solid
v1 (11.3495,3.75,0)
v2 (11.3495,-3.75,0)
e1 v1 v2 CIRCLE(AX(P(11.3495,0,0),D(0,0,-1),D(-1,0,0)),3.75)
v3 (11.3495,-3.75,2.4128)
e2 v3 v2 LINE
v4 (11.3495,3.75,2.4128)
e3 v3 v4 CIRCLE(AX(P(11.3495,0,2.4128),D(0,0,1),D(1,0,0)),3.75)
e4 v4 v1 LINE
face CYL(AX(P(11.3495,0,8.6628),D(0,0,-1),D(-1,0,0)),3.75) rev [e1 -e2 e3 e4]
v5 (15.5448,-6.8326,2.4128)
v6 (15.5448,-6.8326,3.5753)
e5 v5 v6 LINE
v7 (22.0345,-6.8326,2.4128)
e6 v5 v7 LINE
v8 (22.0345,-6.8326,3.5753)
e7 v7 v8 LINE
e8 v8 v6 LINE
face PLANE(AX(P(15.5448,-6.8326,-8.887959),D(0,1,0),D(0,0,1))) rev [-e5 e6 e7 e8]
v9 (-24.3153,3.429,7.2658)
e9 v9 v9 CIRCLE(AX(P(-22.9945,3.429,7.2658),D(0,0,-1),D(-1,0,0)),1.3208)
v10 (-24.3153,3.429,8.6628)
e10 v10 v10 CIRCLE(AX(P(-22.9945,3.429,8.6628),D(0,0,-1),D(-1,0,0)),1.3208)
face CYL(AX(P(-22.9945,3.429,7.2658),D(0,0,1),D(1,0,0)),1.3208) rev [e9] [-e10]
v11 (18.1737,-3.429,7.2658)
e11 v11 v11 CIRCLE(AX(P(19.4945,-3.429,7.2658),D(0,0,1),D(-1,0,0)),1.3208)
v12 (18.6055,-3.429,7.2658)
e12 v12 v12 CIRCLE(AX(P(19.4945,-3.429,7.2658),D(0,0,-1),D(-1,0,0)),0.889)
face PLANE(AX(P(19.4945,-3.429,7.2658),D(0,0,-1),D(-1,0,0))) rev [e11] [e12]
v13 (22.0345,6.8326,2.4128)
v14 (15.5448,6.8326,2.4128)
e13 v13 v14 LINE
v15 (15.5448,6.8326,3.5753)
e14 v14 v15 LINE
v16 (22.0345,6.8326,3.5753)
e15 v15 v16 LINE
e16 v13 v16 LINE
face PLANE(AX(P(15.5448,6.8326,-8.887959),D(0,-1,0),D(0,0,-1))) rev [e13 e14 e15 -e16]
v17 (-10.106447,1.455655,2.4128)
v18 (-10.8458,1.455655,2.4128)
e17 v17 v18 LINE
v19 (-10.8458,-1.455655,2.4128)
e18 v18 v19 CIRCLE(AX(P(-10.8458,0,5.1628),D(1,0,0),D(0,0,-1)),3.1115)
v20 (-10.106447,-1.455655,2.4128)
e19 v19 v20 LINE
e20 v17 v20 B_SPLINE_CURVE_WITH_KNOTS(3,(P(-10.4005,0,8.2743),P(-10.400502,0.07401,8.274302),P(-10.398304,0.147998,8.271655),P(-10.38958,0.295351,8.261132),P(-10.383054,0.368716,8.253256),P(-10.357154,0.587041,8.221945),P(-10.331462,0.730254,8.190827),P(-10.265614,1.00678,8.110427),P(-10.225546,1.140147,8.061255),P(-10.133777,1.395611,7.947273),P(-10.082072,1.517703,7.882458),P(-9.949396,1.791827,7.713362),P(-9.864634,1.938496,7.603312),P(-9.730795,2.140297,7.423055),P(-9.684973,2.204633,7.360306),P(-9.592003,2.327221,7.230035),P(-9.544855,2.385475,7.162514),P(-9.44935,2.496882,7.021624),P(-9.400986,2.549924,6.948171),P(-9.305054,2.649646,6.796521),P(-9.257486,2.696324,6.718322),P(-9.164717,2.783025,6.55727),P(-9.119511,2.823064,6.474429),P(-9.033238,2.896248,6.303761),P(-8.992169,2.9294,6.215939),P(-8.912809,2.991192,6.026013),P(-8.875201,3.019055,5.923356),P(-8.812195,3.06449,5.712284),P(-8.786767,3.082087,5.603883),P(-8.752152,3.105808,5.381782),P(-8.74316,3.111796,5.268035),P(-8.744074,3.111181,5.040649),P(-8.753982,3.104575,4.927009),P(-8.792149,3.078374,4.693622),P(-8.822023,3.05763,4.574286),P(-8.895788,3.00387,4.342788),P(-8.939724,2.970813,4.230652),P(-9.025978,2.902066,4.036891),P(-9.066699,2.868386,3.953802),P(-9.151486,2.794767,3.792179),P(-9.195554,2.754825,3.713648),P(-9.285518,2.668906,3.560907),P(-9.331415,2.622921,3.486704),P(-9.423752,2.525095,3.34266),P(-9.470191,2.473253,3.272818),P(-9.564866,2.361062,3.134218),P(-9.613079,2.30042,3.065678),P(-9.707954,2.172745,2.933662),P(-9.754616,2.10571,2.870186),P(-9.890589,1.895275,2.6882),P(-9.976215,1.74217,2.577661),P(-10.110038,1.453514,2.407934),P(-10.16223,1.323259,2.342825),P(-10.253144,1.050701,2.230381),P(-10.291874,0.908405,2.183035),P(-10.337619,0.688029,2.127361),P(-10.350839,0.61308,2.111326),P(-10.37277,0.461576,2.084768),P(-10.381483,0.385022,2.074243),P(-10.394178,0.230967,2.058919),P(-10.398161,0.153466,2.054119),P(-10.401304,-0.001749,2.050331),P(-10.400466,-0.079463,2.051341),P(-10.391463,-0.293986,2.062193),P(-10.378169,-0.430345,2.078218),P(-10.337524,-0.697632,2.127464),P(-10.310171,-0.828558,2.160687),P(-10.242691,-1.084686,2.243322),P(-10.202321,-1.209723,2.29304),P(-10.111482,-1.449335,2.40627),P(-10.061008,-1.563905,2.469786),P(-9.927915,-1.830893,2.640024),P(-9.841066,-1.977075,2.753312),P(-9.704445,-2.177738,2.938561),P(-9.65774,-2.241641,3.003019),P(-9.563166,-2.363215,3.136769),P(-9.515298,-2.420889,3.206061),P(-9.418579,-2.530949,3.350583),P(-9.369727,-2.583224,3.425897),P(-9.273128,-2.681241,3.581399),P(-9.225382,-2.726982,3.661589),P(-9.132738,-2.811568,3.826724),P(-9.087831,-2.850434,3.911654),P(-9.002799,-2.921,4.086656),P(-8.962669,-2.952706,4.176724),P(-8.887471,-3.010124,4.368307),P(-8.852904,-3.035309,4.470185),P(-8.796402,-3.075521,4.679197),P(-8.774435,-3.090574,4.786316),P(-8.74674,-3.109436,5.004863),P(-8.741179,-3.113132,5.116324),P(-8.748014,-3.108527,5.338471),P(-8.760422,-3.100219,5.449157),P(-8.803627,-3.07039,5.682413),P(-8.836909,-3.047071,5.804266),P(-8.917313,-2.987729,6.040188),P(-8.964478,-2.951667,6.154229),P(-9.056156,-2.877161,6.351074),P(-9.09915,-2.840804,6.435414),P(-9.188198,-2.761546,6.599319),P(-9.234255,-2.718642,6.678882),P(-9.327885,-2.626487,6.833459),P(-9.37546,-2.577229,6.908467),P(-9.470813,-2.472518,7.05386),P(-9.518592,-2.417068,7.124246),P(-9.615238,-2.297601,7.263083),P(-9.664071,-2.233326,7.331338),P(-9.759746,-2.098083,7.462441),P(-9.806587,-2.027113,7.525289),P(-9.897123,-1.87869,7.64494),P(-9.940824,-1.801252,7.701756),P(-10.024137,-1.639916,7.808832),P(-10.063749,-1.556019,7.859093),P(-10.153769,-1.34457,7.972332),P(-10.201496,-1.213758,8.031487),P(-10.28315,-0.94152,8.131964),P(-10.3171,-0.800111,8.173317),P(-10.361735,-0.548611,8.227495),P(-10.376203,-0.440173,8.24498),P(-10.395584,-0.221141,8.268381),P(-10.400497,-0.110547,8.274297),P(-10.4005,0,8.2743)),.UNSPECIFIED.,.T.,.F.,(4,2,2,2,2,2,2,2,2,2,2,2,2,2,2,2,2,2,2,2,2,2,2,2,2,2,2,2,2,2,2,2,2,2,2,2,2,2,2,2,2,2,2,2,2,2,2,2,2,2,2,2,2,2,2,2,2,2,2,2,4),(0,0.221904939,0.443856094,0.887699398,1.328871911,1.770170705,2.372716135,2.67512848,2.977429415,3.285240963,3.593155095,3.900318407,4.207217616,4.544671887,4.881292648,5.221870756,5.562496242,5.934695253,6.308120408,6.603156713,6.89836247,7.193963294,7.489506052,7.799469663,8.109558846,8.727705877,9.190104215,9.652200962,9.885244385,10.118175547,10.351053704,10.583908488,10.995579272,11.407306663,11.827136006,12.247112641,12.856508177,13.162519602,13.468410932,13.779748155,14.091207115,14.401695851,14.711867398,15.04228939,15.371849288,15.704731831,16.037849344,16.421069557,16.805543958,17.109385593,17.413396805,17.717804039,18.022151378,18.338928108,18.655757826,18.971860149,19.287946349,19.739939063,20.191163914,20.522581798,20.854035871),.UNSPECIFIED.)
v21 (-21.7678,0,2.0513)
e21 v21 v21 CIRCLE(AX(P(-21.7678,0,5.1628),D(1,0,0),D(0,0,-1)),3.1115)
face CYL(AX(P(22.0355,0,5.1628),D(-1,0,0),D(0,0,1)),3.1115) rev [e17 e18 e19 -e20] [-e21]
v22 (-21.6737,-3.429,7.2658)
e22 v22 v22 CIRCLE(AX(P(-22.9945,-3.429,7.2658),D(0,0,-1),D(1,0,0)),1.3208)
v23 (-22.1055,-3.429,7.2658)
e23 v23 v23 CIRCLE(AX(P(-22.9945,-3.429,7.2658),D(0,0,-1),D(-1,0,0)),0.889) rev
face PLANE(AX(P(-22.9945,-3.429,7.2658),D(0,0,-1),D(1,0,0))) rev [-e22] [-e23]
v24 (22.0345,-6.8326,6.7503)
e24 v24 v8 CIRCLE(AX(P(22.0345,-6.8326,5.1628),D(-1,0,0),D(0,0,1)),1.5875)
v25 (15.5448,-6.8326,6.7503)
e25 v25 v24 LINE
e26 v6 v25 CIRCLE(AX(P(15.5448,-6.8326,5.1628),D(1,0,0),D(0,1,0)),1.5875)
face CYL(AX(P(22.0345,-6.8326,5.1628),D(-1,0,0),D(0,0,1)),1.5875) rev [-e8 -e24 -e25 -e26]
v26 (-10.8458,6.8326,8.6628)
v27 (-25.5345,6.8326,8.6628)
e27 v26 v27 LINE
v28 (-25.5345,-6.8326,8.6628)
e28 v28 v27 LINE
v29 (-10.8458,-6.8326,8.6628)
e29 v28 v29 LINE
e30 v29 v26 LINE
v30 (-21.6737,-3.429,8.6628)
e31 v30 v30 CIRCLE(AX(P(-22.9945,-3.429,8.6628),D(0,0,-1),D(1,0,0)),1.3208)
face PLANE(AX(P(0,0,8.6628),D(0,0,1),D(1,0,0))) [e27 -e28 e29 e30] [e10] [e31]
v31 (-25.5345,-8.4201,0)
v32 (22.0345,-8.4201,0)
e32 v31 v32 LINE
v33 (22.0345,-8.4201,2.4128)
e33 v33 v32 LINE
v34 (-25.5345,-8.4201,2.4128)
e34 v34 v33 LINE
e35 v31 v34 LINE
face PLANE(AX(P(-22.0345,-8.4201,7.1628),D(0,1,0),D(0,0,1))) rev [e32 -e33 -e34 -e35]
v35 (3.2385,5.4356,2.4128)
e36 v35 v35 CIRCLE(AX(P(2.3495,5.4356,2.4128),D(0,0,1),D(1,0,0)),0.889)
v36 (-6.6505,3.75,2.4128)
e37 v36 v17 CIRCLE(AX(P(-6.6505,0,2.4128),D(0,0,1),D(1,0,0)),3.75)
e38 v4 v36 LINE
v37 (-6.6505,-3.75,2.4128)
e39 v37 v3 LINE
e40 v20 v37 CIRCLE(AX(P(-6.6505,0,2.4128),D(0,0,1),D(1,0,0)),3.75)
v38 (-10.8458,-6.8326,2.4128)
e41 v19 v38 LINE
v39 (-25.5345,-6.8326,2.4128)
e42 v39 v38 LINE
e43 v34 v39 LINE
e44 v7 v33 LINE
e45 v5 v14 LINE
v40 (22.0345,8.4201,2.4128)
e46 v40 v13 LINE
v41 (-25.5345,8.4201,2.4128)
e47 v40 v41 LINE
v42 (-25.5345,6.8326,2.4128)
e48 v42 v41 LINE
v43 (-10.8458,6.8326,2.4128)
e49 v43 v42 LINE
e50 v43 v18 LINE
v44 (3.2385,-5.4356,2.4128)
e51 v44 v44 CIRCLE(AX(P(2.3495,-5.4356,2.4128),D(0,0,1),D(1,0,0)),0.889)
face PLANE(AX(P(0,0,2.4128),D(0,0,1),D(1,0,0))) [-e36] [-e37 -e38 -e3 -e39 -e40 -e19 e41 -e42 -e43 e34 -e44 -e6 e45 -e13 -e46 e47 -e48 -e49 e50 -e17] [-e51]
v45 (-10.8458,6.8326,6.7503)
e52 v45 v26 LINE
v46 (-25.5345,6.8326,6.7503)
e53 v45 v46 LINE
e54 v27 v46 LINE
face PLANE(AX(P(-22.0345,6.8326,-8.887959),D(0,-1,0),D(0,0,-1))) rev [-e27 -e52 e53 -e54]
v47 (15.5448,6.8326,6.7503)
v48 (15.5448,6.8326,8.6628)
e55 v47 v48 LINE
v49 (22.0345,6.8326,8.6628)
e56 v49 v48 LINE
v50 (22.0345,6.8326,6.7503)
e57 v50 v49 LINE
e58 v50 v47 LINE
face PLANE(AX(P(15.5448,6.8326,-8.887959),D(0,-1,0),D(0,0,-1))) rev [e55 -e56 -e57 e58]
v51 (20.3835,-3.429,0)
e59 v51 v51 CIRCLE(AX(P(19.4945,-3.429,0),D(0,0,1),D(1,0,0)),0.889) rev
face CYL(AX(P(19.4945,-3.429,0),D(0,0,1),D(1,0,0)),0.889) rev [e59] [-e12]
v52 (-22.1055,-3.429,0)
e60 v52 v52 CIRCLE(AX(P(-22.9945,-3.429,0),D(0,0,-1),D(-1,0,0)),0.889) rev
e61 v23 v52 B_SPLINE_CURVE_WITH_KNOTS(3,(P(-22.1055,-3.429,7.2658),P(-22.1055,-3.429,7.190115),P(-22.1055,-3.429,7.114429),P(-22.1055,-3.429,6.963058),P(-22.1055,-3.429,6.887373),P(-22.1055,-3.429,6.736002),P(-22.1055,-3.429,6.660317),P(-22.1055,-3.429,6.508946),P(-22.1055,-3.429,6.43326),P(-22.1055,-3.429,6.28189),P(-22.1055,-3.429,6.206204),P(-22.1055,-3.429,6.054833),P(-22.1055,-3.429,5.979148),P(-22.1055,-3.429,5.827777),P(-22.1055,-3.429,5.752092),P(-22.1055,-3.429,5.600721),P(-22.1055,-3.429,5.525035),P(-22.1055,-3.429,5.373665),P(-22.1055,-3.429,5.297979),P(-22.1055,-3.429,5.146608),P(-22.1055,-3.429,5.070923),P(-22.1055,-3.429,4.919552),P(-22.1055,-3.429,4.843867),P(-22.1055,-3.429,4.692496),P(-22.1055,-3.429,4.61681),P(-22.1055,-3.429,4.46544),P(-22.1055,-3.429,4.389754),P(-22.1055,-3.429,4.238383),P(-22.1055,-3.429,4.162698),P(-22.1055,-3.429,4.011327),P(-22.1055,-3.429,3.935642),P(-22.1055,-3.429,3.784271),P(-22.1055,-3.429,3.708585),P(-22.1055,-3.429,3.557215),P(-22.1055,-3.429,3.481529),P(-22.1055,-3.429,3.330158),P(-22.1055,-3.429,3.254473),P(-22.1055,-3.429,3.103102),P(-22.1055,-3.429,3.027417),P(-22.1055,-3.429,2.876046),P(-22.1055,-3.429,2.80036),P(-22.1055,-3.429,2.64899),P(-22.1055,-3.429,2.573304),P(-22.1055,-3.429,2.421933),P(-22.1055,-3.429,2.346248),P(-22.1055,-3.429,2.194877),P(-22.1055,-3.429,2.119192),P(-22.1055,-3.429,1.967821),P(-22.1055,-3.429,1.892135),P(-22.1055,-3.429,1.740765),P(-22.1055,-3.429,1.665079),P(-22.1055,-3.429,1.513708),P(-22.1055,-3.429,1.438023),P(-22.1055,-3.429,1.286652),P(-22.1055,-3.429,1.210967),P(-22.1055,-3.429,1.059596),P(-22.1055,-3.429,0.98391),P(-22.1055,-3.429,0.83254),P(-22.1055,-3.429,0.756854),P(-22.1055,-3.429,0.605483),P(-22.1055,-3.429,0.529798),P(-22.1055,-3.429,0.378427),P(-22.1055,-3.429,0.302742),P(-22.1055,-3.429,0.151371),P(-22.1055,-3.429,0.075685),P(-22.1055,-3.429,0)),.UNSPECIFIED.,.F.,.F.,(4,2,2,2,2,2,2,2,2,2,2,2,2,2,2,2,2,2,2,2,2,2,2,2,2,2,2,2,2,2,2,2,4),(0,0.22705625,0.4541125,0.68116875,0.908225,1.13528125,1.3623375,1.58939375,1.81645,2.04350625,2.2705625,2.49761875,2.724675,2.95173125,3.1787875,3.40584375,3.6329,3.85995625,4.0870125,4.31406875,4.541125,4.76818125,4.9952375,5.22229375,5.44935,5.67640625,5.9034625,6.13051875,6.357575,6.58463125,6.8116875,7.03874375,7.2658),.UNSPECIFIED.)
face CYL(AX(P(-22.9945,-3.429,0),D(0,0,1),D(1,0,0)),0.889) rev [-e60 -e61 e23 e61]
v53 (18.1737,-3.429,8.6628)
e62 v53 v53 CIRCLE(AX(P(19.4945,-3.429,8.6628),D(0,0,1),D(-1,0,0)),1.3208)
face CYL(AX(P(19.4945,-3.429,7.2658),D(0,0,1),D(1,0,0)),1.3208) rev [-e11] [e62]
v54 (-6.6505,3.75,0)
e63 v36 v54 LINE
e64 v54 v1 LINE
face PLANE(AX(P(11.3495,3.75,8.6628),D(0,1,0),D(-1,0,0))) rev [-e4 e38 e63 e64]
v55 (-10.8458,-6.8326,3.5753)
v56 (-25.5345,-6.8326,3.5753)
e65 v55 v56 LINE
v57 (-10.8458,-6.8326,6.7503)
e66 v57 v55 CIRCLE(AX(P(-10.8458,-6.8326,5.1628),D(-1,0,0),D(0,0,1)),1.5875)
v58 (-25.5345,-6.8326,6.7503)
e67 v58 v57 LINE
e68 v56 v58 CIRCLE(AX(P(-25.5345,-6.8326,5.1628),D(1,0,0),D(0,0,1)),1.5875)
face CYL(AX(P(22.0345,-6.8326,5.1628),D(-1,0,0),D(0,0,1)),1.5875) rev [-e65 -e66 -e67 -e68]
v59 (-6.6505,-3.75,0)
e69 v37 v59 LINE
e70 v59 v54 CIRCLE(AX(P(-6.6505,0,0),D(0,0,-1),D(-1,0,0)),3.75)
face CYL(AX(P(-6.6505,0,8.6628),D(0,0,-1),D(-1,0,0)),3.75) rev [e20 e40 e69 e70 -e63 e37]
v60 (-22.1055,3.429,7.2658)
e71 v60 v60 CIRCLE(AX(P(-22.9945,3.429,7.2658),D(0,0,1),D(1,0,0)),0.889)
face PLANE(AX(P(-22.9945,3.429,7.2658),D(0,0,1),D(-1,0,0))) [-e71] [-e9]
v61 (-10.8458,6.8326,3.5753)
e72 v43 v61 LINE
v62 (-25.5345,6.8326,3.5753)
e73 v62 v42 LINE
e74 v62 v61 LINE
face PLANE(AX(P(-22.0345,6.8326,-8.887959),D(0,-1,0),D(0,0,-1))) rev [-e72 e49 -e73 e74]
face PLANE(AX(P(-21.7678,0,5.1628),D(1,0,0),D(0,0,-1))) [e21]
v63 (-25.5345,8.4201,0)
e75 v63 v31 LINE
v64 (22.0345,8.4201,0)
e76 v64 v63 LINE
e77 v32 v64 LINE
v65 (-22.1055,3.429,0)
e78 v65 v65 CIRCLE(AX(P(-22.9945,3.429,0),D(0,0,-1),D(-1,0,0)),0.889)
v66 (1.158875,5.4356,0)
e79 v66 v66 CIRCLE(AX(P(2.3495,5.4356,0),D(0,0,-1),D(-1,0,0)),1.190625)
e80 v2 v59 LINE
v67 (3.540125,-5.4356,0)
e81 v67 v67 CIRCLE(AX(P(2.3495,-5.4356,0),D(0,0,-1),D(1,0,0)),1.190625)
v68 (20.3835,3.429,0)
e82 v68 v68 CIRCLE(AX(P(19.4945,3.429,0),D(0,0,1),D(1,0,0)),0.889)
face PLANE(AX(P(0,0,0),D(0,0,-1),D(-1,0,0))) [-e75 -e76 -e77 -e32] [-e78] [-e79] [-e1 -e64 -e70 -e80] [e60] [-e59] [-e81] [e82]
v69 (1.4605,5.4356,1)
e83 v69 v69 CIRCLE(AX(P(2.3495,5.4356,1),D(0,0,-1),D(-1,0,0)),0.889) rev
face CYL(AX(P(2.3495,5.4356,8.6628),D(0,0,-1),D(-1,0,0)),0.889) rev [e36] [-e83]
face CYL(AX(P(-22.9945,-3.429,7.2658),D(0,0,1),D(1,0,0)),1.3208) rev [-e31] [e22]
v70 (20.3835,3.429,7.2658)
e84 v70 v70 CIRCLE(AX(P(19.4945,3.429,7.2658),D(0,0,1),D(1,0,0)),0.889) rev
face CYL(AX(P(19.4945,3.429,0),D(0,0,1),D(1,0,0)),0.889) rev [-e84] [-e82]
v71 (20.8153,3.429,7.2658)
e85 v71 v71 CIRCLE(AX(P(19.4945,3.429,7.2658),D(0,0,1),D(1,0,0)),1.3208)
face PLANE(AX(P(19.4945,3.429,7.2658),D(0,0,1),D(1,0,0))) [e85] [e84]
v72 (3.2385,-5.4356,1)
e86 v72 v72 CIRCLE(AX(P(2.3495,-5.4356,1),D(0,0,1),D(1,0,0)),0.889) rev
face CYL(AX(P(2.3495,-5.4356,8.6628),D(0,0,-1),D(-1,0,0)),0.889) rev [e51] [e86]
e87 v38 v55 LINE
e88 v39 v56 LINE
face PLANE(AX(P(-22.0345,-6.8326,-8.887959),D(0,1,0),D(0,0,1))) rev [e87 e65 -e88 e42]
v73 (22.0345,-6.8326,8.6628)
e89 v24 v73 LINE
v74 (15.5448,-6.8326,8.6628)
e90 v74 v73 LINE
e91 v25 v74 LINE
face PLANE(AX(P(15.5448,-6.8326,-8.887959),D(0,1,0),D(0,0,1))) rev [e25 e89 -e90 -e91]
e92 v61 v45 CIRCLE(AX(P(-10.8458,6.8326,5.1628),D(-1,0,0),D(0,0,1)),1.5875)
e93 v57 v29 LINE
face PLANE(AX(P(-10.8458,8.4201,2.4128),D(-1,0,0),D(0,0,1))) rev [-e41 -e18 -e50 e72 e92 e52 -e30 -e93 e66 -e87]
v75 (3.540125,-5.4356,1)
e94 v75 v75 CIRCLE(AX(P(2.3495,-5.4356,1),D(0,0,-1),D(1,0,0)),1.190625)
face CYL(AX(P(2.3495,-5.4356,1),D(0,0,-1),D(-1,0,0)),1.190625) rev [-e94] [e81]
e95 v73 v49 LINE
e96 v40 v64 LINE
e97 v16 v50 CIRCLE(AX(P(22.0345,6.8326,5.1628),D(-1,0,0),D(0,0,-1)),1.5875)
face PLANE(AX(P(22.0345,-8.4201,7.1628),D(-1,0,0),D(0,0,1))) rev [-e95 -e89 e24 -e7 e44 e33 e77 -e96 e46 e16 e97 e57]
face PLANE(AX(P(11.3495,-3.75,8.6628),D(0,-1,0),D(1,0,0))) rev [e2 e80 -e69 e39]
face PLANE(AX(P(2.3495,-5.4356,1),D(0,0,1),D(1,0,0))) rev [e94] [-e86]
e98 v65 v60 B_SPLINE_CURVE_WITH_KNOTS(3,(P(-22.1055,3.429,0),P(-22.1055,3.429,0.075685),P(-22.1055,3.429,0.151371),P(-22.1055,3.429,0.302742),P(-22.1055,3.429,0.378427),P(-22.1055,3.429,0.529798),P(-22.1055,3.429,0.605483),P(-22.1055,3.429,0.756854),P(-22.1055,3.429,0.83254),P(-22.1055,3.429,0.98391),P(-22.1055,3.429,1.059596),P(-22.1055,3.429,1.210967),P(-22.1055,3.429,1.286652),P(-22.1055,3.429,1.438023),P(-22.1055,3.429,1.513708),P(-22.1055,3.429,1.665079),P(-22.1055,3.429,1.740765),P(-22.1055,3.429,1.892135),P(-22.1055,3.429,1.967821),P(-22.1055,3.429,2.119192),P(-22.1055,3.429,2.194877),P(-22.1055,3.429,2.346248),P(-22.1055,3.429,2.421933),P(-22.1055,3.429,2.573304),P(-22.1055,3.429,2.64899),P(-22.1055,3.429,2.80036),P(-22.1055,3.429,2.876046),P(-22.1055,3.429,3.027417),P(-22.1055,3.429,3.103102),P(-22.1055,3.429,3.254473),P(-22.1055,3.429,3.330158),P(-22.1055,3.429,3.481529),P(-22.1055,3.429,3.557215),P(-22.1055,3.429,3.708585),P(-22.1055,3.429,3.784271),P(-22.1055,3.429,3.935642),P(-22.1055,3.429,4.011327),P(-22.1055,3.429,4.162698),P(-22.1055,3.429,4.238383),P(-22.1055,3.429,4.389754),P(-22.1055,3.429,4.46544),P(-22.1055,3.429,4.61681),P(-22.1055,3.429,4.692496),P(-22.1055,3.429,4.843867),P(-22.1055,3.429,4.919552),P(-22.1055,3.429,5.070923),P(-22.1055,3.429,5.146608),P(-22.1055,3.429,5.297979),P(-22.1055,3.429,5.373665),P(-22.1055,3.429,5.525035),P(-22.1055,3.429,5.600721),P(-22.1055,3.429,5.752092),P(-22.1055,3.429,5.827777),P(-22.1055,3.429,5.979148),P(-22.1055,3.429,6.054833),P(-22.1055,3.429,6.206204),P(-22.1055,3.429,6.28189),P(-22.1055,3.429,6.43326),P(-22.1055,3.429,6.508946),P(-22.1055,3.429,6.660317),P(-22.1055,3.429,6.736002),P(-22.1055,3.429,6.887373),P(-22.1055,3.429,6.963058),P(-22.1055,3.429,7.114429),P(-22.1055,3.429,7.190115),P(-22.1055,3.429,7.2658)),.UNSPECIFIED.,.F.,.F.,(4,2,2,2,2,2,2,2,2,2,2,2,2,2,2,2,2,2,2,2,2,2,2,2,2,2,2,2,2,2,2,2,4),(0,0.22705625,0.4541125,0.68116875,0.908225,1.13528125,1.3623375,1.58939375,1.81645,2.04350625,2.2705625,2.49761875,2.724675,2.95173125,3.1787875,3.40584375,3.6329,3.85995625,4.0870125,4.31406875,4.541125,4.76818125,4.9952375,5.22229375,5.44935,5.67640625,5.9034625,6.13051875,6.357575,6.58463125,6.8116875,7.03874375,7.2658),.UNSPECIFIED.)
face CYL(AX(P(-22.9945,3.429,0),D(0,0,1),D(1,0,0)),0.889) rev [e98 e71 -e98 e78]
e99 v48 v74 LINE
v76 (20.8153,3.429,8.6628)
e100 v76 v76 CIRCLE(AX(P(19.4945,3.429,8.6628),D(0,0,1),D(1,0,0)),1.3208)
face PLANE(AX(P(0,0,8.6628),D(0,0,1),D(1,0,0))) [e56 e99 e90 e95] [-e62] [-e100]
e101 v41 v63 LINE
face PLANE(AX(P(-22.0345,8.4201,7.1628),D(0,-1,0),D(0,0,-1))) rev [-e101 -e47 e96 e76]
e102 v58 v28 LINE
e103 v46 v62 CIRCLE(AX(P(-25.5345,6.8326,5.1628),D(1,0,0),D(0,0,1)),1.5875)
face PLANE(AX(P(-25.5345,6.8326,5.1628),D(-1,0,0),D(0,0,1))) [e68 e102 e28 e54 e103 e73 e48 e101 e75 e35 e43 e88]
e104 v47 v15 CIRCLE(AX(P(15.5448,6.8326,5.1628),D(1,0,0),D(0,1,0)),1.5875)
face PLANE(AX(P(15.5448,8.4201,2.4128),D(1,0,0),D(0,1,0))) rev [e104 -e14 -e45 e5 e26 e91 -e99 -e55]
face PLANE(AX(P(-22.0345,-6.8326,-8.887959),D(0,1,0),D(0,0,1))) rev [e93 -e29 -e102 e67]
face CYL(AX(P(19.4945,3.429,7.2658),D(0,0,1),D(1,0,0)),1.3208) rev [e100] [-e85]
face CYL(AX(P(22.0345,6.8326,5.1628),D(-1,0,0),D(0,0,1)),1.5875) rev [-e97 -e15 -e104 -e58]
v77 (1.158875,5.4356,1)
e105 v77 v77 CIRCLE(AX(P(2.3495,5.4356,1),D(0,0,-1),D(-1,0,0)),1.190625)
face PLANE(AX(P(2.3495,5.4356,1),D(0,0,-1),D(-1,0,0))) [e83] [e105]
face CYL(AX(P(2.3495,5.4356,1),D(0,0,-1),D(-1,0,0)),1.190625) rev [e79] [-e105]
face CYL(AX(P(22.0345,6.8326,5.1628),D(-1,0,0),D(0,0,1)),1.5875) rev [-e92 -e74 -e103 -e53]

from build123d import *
from build123d.topology import SkipClean

# Parameters (mm, degrees)
SKETCH1_W                       = 44.069
SKETCH1_H                       = 16.8402
BOSS_EXTRUDE1_DEPTH             = 7.1628
SKETCH2_W                       = 26.3906
SKETCH2_H                       = 16.8402
CUT_EXTRUDE1_DEPTH              = 4.75
SKETCH4_W                       = 11.1887
SKETCH4_H                       = 1.5875
SKETCH4_W_2                     = 6.4897
CUT_EXTRUDE9_DEPTH              = 4.75
SKETCH5_R                       = 1.5875
CUT_EXTRUDE10_DEPTH             = 46.43435428
SKETCH14_W                      = 11.1887
SKETCH14_H                      = 13.6652
SKETCH14_W_2                    = 6.4897
BOSS_EXTRUDE3_DEPTH             = 1.5
SKETCH6_R                       = 0.889
CUT_EXTRUDE11_DEPTH             = 26.128895282
SKETCH7_R                       = 1.3208
CUT_EXTRUDE12_DEPTH             = 1.397
SKETCH9_R                       = 0.889
CUT_EXTRUDE13_DEPTH             = 26.128895282
SKETCH10_R                      = 1.190625
CUT_EXTRUDE14_DEPTH             = 1
CUT_EXTRUDE15_DEPTH             = 26.128895282
SKETCH12_R                      = 3.1115
CUT_EXTRUDE16_DEPTH             = 10.922
CUT_EXTRUDE16_DIRECTION_2_REACH = 37.029
BOSS_EXTRUDE4_START             = 3.5
BOSS_EXTRUDE4_DEPTH             = 3.5


with BuildPart() as part:
    # Sketch1 → Boss-Extrude1 (new body)
    with BuildSketch(Plane.XY):
        Rectangle(SKETCH1_W, SKETCH1_H)
    extrude(amount=BOSS_EXTRUDE1_DEPTH)

    # Sketch2 → Cut-Extrude1 (cut)
    with BuildSketch(Plane.XY.offset(7.1628)):
        with Locations((2.3495, 0)):
            Rectangle(SKETCH2_W, SKETCH2_H)
    extrude(amount=-CUT_EXTRUDE1_DEPTH, mode=Mode.SUBTRACT)

    # Sketch4 → Cut-Extrude9 (cut)
    with BuildSketch(Plane.XY.offset(7.1628)):
        with Locations((-16.44015, -7.62635)):
            Rectangle(SKETCH4_W, SKETCH4_H)
        with Locations((-16.44015, 7.62635)):
            Rectangle(SKETCH4_W, SKETCH4_H)
        with Locations((18.78965, -7.62635)):
            Rectangle(SKETCH4_W_2, SKETCH4_H)
        with Locations((18.78965, 7.62635)):
            Rectangle(SKETCH4_W_2, SKETCH4_H)
    extrude(amount=-CUT_EXTRUDE9_DEPTH, mode=Mode.SUBTRACT)

    # Sketch5 → Cut-Extrude10 (cut, through all)
    with BuildSketch(Plane.ZY.offset(22.0345)):
        with Locations((5.1628, -6.8326)):
            Circle(SKETCH5_R)
        with Locations((5.1628, 6.8326)):
            Circle(SKETCH5_R)
    extrude(amount=-CUT_EXTRUDE10_DEPTH, mode=Mode.SUBTRACT)

    # Sketch14 → Boss-Extrude3 (add)
    with BuildSketch(Plane.XY.offset(7.1628)):
        with Locations((-16.44015, 0)):
            Rectangle(SKETCH14_W, SKETCH14_H)
        with Locations((18.78965, 0)):
            Rectangle(SKETCH14_W_2, SKETCH14_H)
    extrude(amount=BOSS_EXTRUDE3_DEPTH)

    # Sketch6 → Cut-Extrude11 (cut, through all)
    with BuildSketch(Plane.XY.offset(8.6628)):
        with Locations((19.4945, 3.429)):
            Circle(SKETCH6_R)
        with Locations((19.4945, -3.429)):
            Circle(SKETCH6_R)
    cut_extrude11 = extrude(amount=-CUT_EXTRUDE11_DEPTH, mode=Mode.SUBTRACT)

    # Sketch7 → Cut-Extrude12 (cut)
    with BuildSketch(Plane.XY.offset(8.6628)):
        with Locations((19.4945, 3.429)):
            Circle(SKETCH7_R)
        with Locations(Location((19.4945, -3.429, 0), (0, 0, 180))):
            Circle(SKETCH7_R)
    cut_extrude12 = extrude(amount=-CUT_EXTRUDE12_DEPTH, mode=Mode.SUBTRACT)

    # Sketch9 → Cut-Extrude13 (cut, through all)
    with BuildSketch(Plane(origin=(0, 0, 0), x_dir=(-1, 0, 0), z_dir=(0, 0, -1))):
        with Locations((-2.3495, 5.4356)):
            Circle(SKETCH9_R)
        with Locations(Location((-2.3495, -5.4356, 0), (0, 0, 180))):
            Circle(SKETCH9_R)
    extrude(amount=-CUT_EXTRUDE13_DEPTH, mode=Mode.SUBTRACT)

    # Sketch10 → Cut-Extrude14 (cut)
    with BuildSketch(Plane(origin=(0, 0, 0), x_dir=(-1, 0, 0), z_dir=(0, 0, -1))):
        with Locations((-2.3495, 5.4356)):
            Circle(SKETCH10_R)
        with Locations(Location((-2.3495, -5.4356, 0), (0, 0, 180))):
            Circle(SKETCH10_R)
    extrude(amount=-CUT_EXTRUDE14_DEPTH, mode=Mode.SUBTRACT)

    # Sketch11 → Cut-Extrude15 (cut, through all)
    with BuildSketch(Plane(origin=(0, 0, 0), x_dir=(-1, 0, 0), z_dir=(0, 0, -1))):
        with BuildLine():
            Line((-11.3495, 3.75), (6.6505, 3.75))
            ThreePointArc((6.6505, 3.75), (10.4005, 0), (6.6505, -3.75))
            Line((6.6505, -3.75), (-11.3495, -3.75))
            ThreePointArc((-11.3495, -3.75), (-15.0995, 0), (-11.3495, 3.75))
        make_face()
    extrude(amount=-CUT_EXTRUDE15_DEPTH, mode=Mode.SUBTRACT)

    # Sketch12 → Cut-Extrude16 (cut)
    with BuildSketch(Plane(origin=(-10.8458, 0, 0), x_dir=(0, 0, -1), z_dir=(1, 0, 0))):
        with Locations(Location((-5.1628, 0, 0), (0, 0, 332.106408593))):
            Circle(SKETCH12_R)
    extrude(amount=-CUT_EXTRUDE16_DEPTH, mode=Mode.SUBTRACT)

    # Sketch12 → Cut-Extrude16 direction 2 (cut, up to next)
    with BuildSketch(Plane(origin=(-10.8458, 0, 0), x_dir=(0, 0, -1), z_dir=(1, 0, 0)), mode=Mode.PRIVATE) as cut_extrude16_direction_2_sk1:
        with Locations(Location((-5.1628, 0, 0), (0, 0, 332.106408593))):
            Circle(SKETCH12_R)
    cut_extrude16_direction_2_tool1 = extrude(cut_extrude16_direction_2_sk1.sketch, amount=CUT_EXTRUDE16_DIRECTION_2_REACH, mode=Mode.PRIVATE) & part.part
    add(cut_extrude16_direction_2_tool1.solids().sort_by_distance((-10.8458, 0, 5.1628))[0], mode=Mode.SUBTRACT)

    # Sketch15 → Boss-Extrude4 (add)
    with SkipClean():  # the faces are left unmerged after this step: merging them gives an invalid solid
        with BuildSketch(Plane.ZY.offset(22.0345).offset(BOSS_EXTRUDE4_START)):
            with BuildLine():
                Line((8.6628, 6.8326), (6.7503, 6.8326))
                ThreePointArc((6.7503, 6.8326), (5.1628, 5.2451), (3.5753, 6.8326))
                Line((3.5753, 6.8326), (2.4128, 6.8326))
                Line((2.4128, 6.8326), (2.4128, 8.4201))
                Line((2.4128, 8.4201), (0, 8.4201))
                Line((0, 8.4201), (0, -8.4201))
                Line((0, -8.4201), (2.4128, -8.4201))
                Line((2.4128, -8.4201), (2.4128, -6.8326))
                Line((2.4128, -6.8326), (3.5753, -6.8326))
                ThreePointArc((3.5753, -6.8326), (5.1628, -5.2451), (6.7503, -6.8326))
                Line((6.7503, -6.8326), (8.6628, -6.8326))
                Line((8.6628, -6.8326), (8.6628, 6.8326))
            make_face()
        extrude(amount=-BOSS_EXTRUDE4_DEPTH)
    add(part.part.scale(1), mode=Mode.REPLACE)  # the faces are merged on a copy

    # Mirror1: Cut-Extrude11, Cut-Extrude12 across plane
    add(cut_extrude11.mirror(Plane(origin=(-1.75, 0, 0), x_dir=(0, 0, 1), z_dir=(1, 0, 0))), mode=Mode.SUBTRACT)
    add(cut_extrude12.mirror(Plane(origin=(-1.75, 0, 0), x_dir=(0, 0, 1), z_dir=(1, 0, 0))), mode=Mode.SUBTRACT)


solid = part.part
